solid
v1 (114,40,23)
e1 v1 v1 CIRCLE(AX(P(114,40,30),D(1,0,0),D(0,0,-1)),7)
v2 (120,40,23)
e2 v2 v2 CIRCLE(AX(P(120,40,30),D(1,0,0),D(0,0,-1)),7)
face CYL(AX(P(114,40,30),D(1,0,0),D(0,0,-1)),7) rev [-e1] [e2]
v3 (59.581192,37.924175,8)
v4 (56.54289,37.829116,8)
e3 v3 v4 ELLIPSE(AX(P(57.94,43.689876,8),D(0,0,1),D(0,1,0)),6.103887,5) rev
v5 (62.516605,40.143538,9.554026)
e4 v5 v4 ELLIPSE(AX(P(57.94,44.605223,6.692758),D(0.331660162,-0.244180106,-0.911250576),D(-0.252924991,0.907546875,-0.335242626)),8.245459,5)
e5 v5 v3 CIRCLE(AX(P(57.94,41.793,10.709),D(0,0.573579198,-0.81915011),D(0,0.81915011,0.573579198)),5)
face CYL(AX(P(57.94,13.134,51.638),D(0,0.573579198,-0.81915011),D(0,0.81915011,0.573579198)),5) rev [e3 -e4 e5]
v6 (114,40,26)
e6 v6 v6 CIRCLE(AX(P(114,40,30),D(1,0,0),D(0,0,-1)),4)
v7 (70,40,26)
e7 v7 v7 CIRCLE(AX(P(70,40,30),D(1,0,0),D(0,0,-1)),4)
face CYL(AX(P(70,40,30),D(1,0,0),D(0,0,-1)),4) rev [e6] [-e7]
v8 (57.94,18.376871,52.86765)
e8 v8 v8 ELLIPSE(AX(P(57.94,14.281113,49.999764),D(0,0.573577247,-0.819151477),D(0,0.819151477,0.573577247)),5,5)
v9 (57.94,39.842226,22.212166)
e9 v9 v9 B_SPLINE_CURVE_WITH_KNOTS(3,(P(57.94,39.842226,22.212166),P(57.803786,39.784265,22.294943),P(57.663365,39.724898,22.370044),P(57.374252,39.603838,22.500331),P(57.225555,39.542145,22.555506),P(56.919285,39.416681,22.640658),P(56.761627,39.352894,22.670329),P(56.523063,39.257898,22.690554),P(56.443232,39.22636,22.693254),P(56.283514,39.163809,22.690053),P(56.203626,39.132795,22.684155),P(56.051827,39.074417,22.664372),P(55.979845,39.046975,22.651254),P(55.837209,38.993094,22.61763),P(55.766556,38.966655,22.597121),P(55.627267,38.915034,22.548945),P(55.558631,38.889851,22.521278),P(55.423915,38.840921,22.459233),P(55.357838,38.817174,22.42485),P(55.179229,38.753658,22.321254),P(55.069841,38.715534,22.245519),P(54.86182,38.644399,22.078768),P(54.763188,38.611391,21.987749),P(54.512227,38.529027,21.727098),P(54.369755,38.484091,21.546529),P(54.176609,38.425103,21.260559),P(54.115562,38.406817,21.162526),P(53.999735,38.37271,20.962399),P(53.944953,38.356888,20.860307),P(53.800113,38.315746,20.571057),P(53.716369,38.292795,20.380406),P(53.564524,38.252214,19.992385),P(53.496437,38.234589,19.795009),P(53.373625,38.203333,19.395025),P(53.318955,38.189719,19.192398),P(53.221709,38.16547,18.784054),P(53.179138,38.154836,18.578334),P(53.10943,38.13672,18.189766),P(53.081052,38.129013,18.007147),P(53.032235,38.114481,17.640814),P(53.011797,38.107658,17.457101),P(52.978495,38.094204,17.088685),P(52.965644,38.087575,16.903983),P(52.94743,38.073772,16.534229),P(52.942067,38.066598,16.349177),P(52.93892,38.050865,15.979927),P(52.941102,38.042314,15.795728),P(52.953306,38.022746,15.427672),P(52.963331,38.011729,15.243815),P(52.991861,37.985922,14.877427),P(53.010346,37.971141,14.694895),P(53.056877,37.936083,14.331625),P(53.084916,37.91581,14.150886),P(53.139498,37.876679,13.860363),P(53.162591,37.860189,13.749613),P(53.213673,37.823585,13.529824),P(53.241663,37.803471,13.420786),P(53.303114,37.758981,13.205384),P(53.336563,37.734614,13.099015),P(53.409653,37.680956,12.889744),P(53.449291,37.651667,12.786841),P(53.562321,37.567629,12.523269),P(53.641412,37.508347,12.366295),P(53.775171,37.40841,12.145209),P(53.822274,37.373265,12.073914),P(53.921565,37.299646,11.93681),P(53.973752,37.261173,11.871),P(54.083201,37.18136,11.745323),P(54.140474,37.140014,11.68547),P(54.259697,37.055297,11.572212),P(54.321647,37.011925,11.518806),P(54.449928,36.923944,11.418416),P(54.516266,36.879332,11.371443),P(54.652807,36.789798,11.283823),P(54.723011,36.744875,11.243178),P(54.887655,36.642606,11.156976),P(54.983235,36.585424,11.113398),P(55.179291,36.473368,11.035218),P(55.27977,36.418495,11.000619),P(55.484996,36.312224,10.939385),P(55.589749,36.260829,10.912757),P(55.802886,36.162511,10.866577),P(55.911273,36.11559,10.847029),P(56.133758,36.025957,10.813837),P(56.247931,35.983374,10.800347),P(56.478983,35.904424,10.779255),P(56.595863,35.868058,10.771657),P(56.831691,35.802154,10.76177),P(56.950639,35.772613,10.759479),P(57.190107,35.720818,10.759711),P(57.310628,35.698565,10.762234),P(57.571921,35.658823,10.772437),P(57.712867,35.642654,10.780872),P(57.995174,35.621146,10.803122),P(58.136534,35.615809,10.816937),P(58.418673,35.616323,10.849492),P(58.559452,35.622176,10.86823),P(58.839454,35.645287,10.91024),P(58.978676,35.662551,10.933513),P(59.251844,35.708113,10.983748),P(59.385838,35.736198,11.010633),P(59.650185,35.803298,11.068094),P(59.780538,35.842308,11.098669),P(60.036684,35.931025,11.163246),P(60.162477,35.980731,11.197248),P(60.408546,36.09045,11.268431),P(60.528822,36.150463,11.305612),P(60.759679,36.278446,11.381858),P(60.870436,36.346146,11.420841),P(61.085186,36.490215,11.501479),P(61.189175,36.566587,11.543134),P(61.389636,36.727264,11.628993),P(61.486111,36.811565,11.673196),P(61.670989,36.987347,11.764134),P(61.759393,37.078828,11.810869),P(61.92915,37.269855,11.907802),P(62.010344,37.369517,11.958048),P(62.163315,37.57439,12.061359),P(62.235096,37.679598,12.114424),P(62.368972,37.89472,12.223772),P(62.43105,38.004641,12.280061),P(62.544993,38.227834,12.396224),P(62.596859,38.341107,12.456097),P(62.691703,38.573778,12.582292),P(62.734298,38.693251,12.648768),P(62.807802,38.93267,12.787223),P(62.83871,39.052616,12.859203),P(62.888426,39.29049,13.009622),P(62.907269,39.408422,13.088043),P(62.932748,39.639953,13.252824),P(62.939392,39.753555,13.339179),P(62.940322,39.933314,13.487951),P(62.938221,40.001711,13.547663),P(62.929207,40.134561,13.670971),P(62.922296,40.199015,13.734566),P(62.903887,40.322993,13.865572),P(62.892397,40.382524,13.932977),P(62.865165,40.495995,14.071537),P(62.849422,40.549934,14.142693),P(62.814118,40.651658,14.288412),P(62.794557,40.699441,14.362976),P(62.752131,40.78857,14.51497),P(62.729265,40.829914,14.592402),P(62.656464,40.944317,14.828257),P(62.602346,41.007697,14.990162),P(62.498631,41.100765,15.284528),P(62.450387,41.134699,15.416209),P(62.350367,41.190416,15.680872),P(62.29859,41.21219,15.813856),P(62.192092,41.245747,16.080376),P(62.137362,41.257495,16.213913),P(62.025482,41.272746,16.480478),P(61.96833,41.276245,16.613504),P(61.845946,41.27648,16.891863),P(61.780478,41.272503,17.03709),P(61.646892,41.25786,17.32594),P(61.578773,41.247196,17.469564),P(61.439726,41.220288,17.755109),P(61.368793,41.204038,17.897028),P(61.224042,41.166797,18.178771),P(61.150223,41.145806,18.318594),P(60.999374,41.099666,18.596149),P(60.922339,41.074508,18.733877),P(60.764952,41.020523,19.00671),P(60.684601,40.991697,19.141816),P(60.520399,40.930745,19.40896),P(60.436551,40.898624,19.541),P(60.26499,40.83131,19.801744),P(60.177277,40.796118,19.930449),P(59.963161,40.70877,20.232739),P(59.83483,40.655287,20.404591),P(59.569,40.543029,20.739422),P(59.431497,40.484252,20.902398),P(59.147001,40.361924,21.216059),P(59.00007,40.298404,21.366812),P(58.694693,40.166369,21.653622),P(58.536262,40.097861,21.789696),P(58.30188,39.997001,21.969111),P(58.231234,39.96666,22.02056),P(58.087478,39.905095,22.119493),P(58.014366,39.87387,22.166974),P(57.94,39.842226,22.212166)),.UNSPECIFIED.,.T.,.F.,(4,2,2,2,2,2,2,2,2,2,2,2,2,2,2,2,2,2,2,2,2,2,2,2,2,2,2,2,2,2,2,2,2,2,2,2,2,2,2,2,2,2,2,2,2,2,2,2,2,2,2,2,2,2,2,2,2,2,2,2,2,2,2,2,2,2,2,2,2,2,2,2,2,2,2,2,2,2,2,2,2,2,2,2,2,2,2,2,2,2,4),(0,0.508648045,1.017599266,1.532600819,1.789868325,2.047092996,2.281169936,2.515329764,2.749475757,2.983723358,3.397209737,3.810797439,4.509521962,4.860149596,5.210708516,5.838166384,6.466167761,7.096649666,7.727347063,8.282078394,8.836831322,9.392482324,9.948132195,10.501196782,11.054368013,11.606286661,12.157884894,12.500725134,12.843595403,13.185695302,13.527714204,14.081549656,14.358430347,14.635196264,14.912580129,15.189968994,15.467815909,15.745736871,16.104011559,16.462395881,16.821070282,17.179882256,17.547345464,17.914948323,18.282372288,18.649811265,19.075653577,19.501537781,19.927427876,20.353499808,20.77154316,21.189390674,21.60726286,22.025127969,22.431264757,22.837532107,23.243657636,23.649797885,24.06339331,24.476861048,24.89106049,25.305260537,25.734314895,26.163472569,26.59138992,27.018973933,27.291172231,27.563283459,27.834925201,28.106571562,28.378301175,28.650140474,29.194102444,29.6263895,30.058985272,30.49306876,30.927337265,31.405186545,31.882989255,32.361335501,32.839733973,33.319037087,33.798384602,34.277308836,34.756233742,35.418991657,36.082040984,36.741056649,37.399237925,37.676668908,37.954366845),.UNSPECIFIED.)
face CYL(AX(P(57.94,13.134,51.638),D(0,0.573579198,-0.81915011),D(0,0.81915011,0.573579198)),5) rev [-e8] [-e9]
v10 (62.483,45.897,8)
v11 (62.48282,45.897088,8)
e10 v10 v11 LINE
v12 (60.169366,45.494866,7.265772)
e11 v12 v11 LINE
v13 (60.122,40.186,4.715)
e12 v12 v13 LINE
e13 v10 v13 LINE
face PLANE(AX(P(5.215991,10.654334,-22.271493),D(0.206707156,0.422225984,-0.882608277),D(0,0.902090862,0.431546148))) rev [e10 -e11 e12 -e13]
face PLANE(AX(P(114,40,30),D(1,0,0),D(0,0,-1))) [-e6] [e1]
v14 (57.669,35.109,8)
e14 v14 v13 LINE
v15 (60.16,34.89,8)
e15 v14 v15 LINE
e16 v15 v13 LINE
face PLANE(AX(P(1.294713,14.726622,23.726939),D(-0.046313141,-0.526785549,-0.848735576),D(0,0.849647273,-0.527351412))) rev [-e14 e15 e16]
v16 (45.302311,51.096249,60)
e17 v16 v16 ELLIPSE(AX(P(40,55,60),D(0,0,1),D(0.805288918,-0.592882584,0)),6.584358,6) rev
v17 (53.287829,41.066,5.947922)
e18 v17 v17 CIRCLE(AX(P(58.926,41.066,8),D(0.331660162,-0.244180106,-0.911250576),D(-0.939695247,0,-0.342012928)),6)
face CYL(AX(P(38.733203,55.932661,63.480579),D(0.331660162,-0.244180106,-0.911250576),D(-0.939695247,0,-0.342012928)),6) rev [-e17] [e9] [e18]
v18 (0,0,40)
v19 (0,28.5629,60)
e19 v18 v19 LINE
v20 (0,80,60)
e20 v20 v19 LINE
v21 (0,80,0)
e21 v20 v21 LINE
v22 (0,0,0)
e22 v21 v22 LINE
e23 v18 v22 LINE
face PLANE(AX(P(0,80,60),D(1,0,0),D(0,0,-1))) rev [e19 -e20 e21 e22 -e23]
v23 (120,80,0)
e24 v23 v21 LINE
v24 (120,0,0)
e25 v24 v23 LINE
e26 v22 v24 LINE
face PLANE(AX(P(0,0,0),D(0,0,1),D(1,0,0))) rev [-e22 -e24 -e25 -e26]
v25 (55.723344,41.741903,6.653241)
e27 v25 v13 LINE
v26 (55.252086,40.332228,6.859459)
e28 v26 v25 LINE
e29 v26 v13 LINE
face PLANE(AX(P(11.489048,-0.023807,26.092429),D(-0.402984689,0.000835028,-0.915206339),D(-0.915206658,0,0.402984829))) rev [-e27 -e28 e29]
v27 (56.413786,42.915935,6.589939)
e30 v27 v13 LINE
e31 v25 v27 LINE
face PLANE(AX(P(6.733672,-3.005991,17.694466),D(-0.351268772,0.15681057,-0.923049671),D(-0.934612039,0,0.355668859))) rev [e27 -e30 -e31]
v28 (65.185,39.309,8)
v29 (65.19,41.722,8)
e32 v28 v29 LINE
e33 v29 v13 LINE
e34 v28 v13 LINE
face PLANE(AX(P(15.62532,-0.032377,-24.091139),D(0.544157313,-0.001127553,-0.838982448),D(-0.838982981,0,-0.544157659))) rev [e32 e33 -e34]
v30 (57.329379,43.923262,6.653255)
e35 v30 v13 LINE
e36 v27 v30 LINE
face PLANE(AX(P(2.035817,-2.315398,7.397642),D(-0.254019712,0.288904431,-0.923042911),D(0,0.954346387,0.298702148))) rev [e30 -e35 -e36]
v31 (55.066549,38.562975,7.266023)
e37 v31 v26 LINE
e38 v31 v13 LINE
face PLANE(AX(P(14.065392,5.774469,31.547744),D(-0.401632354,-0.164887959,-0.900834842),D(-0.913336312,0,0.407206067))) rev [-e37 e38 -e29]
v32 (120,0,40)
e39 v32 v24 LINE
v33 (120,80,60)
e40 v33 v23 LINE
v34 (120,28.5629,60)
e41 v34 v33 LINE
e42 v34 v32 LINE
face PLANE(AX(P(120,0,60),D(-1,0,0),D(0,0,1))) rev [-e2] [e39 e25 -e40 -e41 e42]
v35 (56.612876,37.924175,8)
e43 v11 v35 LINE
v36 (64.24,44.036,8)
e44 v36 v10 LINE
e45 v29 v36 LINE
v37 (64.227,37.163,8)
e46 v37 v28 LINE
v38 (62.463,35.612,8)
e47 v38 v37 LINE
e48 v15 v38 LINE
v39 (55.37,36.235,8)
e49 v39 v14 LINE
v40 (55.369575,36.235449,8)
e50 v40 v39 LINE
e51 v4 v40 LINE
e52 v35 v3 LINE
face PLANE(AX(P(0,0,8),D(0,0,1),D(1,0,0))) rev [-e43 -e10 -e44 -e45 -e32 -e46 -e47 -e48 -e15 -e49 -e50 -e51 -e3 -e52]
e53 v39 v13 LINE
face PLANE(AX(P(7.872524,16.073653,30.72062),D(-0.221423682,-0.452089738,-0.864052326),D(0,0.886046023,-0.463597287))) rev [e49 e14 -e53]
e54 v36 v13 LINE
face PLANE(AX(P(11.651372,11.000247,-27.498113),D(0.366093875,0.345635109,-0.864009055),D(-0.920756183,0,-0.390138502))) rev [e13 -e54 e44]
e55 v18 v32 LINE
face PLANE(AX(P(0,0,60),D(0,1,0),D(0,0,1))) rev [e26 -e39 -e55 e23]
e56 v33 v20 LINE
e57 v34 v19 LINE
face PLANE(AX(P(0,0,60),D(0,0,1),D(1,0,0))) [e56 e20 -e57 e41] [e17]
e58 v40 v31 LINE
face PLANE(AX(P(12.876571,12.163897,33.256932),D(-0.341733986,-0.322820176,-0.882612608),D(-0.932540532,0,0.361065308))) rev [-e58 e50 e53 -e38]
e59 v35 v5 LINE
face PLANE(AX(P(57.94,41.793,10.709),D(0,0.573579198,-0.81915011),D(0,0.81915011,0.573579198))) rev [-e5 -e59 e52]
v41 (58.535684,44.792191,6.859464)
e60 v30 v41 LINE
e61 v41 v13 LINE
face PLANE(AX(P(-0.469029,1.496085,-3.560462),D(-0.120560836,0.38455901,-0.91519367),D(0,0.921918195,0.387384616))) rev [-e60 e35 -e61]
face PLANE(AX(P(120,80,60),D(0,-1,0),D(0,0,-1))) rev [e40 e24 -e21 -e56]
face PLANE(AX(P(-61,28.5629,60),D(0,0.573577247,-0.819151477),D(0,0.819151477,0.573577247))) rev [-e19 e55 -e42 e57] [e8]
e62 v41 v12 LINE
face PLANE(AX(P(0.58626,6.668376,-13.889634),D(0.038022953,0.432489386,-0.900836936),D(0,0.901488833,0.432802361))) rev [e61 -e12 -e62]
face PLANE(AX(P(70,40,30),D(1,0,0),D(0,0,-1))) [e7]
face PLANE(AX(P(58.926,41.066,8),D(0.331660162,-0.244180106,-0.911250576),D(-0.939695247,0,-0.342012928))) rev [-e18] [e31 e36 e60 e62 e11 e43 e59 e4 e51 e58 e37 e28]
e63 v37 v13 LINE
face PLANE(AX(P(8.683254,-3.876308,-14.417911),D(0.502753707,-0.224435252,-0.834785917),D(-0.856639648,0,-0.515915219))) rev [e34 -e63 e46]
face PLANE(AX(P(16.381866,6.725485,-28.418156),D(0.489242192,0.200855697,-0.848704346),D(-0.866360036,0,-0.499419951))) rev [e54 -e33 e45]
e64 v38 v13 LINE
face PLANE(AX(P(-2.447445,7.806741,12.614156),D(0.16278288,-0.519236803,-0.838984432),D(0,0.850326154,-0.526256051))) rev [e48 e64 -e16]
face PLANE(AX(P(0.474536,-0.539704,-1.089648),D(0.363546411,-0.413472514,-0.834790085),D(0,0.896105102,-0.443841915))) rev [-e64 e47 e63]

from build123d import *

# Parameters (mm, degrees)
SKETCH_1_W          = 120
SKETCH_1_H          = 80
EXTRUDE_1_DEPTH     = 60
CUT_EXTRUDE_1_DEPTH = 121
SKETCH_5_R          = 7
CUT_EXTRUDE_2_DEPTH = 6
SKETCH_6_R          = 4
CUT_EXTRUDE_3_DEPTH = 50
SWEEP_START         = -57.550317598
SWEEP_6_OUTLINE_R   = 6
SWEEP_6_DEPTH       = 59.776219427
SWEEP_10_PROFILE_R  = 5


# Read off the part's stored shape, not the designer's step: 切除-扫描6
with BuildPart() as part:
    # 草图1 → 凸台-拉伸1 (new body)
    with BuildSketch(Plane.XY):
        with Locations((60, 40)):
            Rectangle(SKETCH_1_W, SKETCH_1_H)
    extrude(amount=EXTRUDE_1_DEPTH)

    # 草图2 → 切除-拉伸1 (cut, symmetric)
    with BuildSketch(Plane(origin=(60, 0, 0), x_dir=(0, 0, -1), z_dir=(1, 0, 0))):
        Polygon((-40, 0), (-60, 0), (-60, 28.5629), align=None)
    extrude(amount=CUT_EXTRUDE_1_DEPTH, both=True, mode=Mode.SUBTRACT)

    # 草图5 → 切除-拉伸2 (cut)
    with BuildSketch(Plane(origin=(120, 0, 0), x_dir=(0, 0, -1), z_dir=(1, 0, 0))):
        with Locations((-30, 40)):
            Circle(SKETCH_5_R)
    extrude(amount=-CUT_EXTRUDE_2_DEPTH, mode=Mode.SUBTRACT)

    # 草图6 → 切除-拉伸3 (cut)
    with BuildSketch(Plane(origin=(120, 0, 0), x_dir=(0, 0, -1), z_dir=(1, 0, 0))):
        with Locations((-30, 40)):
            Circle(SKETCH_6_R)
    extrude(amount=-CUT_EXTRUDE_3_DEPTH, mode=Mode.SUBTRACT)

    # 切除-扫描6 outline → 切除-扫描6 (cut)
    with BuildSketch(Plane(origin=(0, 0, 0), x_dir=(0.9433989278967365, 0.08584365654425449, 0.3203581269054996), z_dir=(0.331660161676509, -0.244180106351077, -0.911250576306588)).offset(SWEEP_START)):
        with Locations((61.67884584, -37.595946176)):
            Circle(SWEEP_6_OUTLINE_R)
    extrude(amount=SWEEP_6_DEPTH, mode=Mode.SUBTRACT)

    # 切除-扫描10: sweep along a curve in space
    with BuildLine() as sweep_10_path:
        Line((57.94, 13.134, 51.638), (57.94, 41.793, 10.709))
    # 切除-扫描10 profile (on start of the path) → 切除-扫描10 (sweep, cut)
    with BuildSketch(Plane(origin=(57.94, 13.134, 51.638), x_dir=(0, -0.8191501102855187, -0.5735791983843407), z_dir=(0, 0.5735791983843407, -0.8191501102855187))):
        Circle(SWEEP_10_PROFILE_R)
    sweep(path=sweep_10_path.line, mode=Mode.SUBTRACT)

    # 草图41 → 切除-放样5 section 0
    with BuildSketch(Plane.XY.offset(8), mode=Mode.PRIVATE) as loft_5_s0:
        with BuildLine():
            Line((64.227, 37.163), (65.185, 39.309))
            Line((65.185, 39.309), (65.19, 41.722))
            Line((65.19, 41.722), (64.24, 44.036))
            Line((64.24, 44.036), (62.483, 45.897))
            Line((62.483, 45.897), (60.183, 47.023))
            Line((60.183, 47.023), (57.692, 47.242))
            Line((57.692, 47.242), (55.389, 46.52))
            Line((55.389, 46.52), (53.625, 44.969))
            Line((53.625, 44.969), (52.667, 42.823))
            Line((52.667, 42.823), (52.662, 40.41))
            Line((52.662, 40.41), (53.612, 38.096))
            Line((53.612, 38.096), (55.37, 36.235))
            Line((55.37, 36.235), (57.669, 35.109))
            Line((57.669, 35.109), (60.16, 34.89))
            Line((60.16, 34.89), (62.463, 35.612))
            Line((62.463, 35.612), (64.227, 37.163))
        make_face()
    loft([loft_5_s0.sketch, Vertex(60.122, 40.186, 4.715)], mode=Mode.SUBTRACT)


solid = part.part
